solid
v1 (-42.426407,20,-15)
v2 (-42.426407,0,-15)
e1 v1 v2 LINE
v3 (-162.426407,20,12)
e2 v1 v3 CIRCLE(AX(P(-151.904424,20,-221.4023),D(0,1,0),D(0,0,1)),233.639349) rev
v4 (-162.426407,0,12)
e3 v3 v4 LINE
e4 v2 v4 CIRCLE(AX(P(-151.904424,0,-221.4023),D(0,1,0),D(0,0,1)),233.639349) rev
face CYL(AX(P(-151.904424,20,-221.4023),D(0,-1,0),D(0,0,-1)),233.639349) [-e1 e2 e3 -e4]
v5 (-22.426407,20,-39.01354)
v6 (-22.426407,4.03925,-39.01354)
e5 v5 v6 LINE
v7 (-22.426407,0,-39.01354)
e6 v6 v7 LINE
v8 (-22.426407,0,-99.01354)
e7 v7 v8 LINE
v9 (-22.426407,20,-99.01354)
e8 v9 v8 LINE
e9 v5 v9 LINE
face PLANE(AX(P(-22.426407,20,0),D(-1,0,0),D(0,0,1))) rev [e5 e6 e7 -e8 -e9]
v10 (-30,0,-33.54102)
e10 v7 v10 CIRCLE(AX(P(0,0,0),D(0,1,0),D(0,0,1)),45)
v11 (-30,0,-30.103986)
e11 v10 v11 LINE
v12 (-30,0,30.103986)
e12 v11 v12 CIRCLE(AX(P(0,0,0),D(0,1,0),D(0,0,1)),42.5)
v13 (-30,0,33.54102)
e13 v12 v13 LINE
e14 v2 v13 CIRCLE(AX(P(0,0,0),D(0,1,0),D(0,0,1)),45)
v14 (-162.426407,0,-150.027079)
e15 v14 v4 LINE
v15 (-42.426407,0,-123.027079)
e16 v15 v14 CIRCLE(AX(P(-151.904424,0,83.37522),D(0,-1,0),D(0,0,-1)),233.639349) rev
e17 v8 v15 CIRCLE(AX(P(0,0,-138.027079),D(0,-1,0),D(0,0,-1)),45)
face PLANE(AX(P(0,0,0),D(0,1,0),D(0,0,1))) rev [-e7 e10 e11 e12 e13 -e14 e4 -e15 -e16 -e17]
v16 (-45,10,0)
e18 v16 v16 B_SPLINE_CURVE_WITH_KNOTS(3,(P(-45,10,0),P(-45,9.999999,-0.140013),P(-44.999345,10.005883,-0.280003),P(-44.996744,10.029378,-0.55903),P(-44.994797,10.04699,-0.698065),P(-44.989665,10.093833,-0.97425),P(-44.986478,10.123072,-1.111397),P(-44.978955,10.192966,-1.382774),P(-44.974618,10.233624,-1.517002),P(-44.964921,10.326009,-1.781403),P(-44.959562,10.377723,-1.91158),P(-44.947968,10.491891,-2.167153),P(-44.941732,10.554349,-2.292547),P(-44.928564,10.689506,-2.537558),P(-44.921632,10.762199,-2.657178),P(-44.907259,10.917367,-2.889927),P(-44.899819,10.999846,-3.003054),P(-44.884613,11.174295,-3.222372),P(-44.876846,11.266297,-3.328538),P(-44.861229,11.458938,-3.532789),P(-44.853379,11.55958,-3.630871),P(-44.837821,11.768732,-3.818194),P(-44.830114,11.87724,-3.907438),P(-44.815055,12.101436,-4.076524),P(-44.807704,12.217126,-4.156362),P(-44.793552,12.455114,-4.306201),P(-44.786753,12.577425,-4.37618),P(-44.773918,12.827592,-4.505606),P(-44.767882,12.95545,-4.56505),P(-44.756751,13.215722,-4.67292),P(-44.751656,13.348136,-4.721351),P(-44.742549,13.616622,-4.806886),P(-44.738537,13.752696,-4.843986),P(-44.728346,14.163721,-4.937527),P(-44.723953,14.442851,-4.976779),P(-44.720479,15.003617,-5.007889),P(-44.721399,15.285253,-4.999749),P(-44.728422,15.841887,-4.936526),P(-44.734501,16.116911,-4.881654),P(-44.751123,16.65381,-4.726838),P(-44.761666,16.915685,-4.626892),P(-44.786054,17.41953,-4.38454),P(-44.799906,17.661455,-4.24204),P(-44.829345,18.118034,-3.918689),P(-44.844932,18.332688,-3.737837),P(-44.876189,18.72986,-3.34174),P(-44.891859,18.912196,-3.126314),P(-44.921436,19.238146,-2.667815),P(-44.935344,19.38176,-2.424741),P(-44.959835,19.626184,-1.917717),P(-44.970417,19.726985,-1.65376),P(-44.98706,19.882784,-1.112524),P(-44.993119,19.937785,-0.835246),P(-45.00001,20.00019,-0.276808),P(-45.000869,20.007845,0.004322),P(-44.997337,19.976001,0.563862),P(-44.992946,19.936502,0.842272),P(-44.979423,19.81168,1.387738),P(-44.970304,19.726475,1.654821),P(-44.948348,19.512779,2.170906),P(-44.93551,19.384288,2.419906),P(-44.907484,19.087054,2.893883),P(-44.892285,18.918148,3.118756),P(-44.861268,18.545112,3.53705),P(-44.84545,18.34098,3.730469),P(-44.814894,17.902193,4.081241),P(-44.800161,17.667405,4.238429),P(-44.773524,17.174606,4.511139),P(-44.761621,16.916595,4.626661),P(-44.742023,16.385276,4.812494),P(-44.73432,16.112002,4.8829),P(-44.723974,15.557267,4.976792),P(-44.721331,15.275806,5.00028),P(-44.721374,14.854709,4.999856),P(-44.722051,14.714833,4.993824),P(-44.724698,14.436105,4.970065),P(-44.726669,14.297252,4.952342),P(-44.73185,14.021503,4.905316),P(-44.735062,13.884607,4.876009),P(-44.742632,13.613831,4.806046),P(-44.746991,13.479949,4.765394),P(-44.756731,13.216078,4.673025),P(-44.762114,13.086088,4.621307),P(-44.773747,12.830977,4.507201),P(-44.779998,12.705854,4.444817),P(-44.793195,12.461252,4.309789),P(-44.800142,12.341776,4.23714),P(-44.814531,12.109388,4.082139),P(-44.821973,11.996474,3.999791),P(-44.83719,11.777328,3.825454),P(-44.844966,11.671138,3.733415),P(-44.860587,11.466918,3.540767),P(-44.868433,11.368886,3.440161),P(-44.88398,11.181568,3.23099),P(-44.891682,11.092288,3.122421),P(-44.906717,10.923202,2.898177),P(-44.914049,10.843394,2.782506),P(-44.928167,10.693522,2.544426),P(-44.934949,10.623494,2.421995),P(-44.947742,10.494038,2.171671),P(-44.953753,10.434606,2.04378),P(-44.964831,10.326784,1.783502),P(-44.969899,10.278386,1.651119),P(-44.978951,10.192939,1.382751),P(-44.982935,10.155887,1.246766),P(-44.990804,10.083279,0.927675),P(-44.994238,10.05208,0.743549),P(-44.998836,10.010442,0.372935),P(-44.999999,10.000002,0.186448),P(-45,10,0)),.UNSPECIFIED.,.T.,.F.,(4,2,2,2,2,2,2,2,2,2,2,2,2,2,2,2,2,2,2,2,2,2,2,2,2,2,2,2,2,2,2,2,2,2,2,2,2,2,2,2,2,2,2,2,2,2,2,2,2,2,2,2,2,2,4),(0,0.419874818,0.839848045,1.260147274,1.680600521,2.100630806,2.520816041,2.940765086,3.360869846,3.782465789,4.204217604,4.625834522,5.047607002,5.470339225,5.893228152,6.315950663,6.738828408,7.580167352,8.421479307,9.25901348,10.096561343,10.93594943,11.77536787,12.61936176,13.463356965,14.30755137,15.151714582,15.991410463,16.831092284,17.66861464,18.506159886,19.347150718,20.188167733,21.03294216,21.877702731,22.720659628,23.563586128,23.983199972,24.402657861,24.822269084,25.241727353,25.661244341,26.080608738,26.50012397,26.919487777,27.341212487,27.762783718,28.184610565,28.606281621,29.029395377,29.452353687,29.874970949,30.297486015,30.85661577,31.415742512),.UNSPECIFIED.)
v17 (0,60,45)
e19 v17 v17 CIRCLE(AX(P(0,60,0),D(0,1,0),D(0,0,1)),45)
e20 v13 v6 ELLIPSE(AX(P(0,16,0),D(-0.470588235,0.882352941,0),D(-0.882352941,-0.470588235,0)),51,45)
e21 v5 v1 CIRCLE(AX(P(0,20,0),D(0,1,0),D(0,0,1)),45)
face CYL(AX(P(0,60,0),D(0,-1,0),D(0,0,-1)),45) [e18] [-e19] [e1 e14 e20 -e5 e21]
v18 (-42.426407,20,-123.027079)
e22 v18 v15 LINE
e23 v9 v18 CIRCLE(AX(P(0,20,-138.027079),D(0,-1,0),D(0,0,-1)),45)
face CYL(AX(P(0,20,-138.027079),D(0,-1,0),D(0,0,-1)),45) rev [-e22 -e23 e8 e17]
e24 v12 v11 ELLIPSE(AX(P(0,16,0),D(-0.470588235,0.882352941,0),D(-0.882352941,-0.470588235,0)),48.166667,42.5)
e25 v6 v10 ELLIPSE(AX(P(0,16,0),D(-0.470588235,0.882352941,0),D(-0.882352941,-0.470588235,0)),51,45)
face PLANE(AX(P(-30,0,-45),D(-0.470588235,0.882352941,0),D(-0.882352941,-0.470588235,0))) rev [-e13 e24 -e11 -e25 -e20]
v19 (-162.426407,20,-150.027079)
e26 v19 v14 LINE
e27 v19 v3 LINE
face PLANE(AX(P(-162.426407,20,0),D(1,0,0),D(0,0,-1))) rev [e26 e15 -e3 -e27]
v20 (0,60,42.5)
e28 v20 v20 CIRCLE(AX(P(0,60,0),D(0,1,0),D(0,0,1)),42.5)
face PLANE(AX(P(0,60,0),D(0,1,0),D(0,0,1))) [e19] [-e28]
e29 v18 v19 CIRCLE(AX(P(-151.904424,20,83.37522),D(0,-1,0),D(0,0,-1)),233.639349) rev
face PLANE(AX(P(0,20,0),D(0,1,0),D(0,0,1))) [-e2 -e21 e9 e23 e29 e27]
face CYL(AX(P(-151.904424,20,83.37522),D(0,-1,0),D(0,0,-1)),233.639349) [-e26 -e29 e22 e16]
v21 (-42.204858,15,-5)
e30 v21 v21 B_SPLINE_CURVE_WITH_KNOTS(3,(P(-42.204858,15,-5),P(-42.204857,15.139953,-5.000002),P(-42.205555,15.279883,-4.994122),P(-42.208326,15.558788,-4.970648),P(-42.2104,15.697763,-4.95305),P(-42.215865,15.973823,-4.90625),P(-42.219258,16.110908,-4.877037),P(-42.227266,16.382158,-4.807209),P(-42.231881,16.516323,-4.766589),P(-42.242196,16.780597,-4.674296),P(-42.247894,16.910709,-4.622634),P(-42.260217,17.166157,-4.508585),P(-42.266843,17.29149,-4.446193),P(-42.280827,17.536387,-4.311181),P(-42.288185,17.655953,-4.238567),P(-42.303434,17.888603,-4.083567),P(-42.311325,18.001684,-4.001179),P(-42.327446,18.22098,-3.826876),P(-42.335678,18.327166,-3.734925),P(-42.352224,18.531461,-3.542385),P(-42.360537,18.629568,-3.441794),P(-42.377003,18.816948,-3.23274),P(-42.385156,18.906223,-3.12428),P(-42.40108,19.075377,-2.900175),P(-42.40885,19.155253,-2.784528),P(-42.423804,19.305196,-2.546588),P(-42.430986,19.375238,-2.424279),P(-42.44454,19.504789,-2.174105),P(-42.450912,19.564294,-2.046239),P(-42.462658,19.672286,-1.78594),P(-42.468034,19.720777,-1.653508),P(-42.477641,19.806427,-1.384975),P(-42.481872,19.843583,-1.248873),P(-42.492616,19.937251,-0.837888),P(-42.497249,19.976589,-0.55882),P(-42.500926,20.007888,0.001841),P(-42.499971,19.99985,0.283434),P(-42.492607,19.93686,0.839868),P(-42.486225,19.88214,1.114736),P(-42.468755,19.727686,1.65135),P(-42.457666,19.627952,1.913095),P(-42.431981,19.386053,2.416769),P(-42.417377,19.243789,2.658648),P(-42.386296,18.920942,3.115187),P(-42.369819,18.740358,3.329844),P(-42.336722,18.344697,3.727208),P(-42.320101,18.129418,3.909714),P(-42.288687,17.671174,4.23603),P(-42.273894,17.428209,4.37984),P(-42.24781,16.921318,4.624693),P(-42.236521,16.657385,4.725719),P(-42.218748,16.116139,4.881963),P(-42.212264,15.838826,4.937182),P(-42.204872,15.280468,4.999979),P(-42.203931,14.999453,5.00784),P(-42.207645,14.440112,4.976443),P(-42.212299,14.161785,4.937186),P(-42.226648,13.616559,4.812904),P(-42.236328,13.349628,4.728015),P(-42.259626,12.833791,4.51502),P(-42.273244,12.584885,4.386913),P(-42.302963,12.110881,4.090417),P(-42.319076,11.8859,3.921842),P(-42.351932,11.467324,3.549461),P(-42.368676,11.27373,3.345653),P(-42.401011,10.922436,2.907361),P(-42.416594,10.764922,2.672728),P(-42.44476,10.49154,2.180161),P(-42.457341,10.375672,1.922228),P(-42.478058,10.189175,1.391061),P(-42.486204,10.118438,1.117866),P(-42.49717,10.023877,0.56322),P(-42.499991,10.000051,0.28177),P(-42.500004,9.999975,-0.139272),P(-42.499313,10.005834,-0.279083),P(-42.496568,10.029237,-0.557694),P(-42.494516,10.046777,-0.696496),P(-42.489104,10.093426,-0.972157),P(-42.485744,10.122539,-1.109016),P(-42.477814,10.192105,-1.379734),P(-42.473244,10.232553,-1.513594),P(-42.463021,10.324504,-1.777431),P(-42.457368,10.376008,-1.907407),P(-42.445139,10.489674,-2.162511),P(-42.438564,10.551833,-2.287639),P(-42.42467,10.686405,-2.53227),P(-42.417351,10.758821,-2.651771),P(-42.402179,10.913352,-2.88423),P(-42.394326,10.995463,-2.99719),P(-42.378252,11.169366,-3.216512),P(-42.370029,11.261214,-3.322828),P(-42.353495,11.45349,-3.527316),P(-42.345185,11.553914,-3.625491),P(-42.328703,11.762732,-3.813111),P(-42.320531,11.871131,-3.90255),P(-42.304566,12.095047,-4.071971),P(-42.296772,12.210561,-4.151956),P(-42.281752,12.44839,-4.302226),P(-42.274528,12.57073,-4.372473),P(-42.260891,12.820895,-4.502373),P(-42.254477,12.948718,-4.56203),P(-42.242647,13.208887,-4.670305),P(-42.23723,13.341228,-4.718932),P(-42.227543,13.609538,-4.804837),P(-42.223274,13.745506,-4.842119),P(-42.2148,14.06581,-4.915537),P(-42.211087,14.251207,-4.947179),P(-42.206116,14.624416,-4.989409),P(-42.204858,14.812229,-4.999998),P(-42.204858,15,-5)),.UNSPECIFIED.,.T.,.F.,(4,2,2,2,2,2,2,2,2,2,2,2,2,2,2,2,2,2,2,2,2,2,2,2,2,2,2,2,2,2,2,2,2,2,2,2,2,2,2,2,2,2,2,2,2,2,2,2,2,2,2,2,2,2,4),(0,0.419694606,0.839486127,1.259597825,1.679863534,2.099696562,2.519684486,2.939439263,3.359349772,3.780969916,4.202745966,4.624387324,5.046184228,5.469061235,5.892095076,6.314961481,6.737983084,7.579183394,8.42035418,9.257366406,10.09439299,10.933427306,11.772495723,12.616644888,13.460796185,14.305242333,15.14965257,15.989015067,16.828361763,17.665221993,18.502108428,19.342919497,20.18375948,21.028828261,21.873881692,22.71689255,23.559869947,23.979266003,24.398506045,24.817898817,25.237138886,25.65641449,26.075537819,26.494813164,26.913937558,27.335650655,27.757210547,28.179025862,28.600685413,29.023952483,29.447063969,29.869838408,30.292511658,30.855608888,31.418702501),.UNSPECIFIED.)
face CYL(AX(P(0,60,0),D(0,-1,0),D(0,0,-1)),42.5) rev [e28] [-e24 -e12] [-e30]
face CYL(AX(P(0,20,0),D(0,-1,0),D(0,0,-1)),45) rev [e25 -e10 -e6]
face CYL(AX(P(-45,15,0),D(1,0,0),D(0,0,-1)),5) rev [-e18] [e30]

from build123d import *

# Parameters (mm, degrees)
SKETCH2_R               = 45
SKETCH2_R_2             = 42.5
BOSS_EXTRUDE1_DEPTH     = 60
CUT_EXTRUDE1_DEPTH      = 88.464278423
CUT_EXTRUDE1_DEPTH_BACK = 88.464278423
CUT_EXTRUDE2_DEPTH      = 88.464278423
CUT_EXTRUDE2_DEPTH_BACK = 88.464278423
SKETCH4_R               = 5
BOSS_EXTRUDE2_DEPTH     = 20
MIRROR1_DEPTH           = 20


# Read off the part's stored shape, not the designer's step: Mirror1
with BuildPart() as part:
    # Sketch2 → Boss-Extrude1 (new body)
    with BuildSketch(Plane(origin=(0, 0, 0), x_dir=(1, 0, 0), z_dir=(0, 1, 0))):
        with Locations(Location((0, 0, 0), (0, 0, 270))):
            Circle(SKETCH2_R)
        with Locations(Location((0, 0, 0), (0, 0, 270))):
            Circle(SKETCH2_R_2, mode=Mode.SUBTRACT)
    extrude(amount=BOSS_EXTRUDE1_DEPTH)

    # Sketch3 → Cut-Extrude1 (cut, two sides: drawn at the far end of the back side and taken through both)
    with BuildSketch(Plane.XY.offset(-CUT_EXTRUDE1_DEPTH_BACK)):
        Polygon((-30, 0), (45, 40), (45, 0), align=None)
    extrude(amount=CUT_EXTRUDE1_DEPTH + CUT_EXTRUDE1_DEPTH_BACK, mode=Mode.SUBTRACT)

    # Sketch4 → Cut-Extrude2 (cut, two sides: drawn at the far end of the back side and taken through both)
    with BuildSketch(Plane(origin=(0, 0, 0), x_dir=(0, 0, -1), z_dir=(1, 0, 0)).offset(-CUT_EXTRUDE2_DEPTH_BACK)):
        with Locations((0, 15)):
            Circle(SKETCH4_R)
    extrude(amount=CUT_EXTRUDE2_DEPTH + CUT_EXTRUDE2_DEPTH_BACK, mode=Mode.SUBTRACT)

    # Sketch5 → Boss-Extrude2 (add)
    with BuildSketch(Plane(origin=(0, 0, 0), x_dir=(1, 0, 0), z_dir=(0, 1, 0))):
        with BuildLine():
            ThreePointArc((-22.426406871, 39.013539635), (-34.577946498, 28.798708582), (-42.426406871, 15))
            ThreePointArc((-42.426406871, 15), (-100.617737833, -6.538529057), (-162.426406871, -12))
            Line((-162.426406871, -12), (-162.426406871, 69.013539635))
            Line((-162.426406871, 69.013539635), (-22.426406871, 69.013539635))
            Line((-22.426406871, 69.013539635), (-22.426406871, 39.013539635))
        make_face()
    extrude(amount=BOSS_EXTRUDE2_DEPTH)

    # Mirror1 outline → Mirror1 (add)
    with BuildSketch(Plane(origin=(0, 0, 0), x_dir=(1, 0, 0), z_dir=(0, 1, 0))):
        with BuildLine():
            Line((-22.426406871, 69.013539635), (-22.426406871, 99.013539635))
            ThreePointArc((-22.426406871, 99.013539635), (-34.577946498, 109.228370688), (-42.426406871, 123.02707927))
            ThreePointArc((-42.426406871, 123.02707927), (-100.617737833, 144.565608327), (-162.426406871, 150.02707927))
            Line((-162.426406871, 150.02707927), (-162.426406871, 69.013539635))
            Line((-162.426406871, 69.013539635), (-22.426406871, 69.013539635))
        make_face()
    extrude(amount=MIRROR1_DEPTH)


solid = part.part
